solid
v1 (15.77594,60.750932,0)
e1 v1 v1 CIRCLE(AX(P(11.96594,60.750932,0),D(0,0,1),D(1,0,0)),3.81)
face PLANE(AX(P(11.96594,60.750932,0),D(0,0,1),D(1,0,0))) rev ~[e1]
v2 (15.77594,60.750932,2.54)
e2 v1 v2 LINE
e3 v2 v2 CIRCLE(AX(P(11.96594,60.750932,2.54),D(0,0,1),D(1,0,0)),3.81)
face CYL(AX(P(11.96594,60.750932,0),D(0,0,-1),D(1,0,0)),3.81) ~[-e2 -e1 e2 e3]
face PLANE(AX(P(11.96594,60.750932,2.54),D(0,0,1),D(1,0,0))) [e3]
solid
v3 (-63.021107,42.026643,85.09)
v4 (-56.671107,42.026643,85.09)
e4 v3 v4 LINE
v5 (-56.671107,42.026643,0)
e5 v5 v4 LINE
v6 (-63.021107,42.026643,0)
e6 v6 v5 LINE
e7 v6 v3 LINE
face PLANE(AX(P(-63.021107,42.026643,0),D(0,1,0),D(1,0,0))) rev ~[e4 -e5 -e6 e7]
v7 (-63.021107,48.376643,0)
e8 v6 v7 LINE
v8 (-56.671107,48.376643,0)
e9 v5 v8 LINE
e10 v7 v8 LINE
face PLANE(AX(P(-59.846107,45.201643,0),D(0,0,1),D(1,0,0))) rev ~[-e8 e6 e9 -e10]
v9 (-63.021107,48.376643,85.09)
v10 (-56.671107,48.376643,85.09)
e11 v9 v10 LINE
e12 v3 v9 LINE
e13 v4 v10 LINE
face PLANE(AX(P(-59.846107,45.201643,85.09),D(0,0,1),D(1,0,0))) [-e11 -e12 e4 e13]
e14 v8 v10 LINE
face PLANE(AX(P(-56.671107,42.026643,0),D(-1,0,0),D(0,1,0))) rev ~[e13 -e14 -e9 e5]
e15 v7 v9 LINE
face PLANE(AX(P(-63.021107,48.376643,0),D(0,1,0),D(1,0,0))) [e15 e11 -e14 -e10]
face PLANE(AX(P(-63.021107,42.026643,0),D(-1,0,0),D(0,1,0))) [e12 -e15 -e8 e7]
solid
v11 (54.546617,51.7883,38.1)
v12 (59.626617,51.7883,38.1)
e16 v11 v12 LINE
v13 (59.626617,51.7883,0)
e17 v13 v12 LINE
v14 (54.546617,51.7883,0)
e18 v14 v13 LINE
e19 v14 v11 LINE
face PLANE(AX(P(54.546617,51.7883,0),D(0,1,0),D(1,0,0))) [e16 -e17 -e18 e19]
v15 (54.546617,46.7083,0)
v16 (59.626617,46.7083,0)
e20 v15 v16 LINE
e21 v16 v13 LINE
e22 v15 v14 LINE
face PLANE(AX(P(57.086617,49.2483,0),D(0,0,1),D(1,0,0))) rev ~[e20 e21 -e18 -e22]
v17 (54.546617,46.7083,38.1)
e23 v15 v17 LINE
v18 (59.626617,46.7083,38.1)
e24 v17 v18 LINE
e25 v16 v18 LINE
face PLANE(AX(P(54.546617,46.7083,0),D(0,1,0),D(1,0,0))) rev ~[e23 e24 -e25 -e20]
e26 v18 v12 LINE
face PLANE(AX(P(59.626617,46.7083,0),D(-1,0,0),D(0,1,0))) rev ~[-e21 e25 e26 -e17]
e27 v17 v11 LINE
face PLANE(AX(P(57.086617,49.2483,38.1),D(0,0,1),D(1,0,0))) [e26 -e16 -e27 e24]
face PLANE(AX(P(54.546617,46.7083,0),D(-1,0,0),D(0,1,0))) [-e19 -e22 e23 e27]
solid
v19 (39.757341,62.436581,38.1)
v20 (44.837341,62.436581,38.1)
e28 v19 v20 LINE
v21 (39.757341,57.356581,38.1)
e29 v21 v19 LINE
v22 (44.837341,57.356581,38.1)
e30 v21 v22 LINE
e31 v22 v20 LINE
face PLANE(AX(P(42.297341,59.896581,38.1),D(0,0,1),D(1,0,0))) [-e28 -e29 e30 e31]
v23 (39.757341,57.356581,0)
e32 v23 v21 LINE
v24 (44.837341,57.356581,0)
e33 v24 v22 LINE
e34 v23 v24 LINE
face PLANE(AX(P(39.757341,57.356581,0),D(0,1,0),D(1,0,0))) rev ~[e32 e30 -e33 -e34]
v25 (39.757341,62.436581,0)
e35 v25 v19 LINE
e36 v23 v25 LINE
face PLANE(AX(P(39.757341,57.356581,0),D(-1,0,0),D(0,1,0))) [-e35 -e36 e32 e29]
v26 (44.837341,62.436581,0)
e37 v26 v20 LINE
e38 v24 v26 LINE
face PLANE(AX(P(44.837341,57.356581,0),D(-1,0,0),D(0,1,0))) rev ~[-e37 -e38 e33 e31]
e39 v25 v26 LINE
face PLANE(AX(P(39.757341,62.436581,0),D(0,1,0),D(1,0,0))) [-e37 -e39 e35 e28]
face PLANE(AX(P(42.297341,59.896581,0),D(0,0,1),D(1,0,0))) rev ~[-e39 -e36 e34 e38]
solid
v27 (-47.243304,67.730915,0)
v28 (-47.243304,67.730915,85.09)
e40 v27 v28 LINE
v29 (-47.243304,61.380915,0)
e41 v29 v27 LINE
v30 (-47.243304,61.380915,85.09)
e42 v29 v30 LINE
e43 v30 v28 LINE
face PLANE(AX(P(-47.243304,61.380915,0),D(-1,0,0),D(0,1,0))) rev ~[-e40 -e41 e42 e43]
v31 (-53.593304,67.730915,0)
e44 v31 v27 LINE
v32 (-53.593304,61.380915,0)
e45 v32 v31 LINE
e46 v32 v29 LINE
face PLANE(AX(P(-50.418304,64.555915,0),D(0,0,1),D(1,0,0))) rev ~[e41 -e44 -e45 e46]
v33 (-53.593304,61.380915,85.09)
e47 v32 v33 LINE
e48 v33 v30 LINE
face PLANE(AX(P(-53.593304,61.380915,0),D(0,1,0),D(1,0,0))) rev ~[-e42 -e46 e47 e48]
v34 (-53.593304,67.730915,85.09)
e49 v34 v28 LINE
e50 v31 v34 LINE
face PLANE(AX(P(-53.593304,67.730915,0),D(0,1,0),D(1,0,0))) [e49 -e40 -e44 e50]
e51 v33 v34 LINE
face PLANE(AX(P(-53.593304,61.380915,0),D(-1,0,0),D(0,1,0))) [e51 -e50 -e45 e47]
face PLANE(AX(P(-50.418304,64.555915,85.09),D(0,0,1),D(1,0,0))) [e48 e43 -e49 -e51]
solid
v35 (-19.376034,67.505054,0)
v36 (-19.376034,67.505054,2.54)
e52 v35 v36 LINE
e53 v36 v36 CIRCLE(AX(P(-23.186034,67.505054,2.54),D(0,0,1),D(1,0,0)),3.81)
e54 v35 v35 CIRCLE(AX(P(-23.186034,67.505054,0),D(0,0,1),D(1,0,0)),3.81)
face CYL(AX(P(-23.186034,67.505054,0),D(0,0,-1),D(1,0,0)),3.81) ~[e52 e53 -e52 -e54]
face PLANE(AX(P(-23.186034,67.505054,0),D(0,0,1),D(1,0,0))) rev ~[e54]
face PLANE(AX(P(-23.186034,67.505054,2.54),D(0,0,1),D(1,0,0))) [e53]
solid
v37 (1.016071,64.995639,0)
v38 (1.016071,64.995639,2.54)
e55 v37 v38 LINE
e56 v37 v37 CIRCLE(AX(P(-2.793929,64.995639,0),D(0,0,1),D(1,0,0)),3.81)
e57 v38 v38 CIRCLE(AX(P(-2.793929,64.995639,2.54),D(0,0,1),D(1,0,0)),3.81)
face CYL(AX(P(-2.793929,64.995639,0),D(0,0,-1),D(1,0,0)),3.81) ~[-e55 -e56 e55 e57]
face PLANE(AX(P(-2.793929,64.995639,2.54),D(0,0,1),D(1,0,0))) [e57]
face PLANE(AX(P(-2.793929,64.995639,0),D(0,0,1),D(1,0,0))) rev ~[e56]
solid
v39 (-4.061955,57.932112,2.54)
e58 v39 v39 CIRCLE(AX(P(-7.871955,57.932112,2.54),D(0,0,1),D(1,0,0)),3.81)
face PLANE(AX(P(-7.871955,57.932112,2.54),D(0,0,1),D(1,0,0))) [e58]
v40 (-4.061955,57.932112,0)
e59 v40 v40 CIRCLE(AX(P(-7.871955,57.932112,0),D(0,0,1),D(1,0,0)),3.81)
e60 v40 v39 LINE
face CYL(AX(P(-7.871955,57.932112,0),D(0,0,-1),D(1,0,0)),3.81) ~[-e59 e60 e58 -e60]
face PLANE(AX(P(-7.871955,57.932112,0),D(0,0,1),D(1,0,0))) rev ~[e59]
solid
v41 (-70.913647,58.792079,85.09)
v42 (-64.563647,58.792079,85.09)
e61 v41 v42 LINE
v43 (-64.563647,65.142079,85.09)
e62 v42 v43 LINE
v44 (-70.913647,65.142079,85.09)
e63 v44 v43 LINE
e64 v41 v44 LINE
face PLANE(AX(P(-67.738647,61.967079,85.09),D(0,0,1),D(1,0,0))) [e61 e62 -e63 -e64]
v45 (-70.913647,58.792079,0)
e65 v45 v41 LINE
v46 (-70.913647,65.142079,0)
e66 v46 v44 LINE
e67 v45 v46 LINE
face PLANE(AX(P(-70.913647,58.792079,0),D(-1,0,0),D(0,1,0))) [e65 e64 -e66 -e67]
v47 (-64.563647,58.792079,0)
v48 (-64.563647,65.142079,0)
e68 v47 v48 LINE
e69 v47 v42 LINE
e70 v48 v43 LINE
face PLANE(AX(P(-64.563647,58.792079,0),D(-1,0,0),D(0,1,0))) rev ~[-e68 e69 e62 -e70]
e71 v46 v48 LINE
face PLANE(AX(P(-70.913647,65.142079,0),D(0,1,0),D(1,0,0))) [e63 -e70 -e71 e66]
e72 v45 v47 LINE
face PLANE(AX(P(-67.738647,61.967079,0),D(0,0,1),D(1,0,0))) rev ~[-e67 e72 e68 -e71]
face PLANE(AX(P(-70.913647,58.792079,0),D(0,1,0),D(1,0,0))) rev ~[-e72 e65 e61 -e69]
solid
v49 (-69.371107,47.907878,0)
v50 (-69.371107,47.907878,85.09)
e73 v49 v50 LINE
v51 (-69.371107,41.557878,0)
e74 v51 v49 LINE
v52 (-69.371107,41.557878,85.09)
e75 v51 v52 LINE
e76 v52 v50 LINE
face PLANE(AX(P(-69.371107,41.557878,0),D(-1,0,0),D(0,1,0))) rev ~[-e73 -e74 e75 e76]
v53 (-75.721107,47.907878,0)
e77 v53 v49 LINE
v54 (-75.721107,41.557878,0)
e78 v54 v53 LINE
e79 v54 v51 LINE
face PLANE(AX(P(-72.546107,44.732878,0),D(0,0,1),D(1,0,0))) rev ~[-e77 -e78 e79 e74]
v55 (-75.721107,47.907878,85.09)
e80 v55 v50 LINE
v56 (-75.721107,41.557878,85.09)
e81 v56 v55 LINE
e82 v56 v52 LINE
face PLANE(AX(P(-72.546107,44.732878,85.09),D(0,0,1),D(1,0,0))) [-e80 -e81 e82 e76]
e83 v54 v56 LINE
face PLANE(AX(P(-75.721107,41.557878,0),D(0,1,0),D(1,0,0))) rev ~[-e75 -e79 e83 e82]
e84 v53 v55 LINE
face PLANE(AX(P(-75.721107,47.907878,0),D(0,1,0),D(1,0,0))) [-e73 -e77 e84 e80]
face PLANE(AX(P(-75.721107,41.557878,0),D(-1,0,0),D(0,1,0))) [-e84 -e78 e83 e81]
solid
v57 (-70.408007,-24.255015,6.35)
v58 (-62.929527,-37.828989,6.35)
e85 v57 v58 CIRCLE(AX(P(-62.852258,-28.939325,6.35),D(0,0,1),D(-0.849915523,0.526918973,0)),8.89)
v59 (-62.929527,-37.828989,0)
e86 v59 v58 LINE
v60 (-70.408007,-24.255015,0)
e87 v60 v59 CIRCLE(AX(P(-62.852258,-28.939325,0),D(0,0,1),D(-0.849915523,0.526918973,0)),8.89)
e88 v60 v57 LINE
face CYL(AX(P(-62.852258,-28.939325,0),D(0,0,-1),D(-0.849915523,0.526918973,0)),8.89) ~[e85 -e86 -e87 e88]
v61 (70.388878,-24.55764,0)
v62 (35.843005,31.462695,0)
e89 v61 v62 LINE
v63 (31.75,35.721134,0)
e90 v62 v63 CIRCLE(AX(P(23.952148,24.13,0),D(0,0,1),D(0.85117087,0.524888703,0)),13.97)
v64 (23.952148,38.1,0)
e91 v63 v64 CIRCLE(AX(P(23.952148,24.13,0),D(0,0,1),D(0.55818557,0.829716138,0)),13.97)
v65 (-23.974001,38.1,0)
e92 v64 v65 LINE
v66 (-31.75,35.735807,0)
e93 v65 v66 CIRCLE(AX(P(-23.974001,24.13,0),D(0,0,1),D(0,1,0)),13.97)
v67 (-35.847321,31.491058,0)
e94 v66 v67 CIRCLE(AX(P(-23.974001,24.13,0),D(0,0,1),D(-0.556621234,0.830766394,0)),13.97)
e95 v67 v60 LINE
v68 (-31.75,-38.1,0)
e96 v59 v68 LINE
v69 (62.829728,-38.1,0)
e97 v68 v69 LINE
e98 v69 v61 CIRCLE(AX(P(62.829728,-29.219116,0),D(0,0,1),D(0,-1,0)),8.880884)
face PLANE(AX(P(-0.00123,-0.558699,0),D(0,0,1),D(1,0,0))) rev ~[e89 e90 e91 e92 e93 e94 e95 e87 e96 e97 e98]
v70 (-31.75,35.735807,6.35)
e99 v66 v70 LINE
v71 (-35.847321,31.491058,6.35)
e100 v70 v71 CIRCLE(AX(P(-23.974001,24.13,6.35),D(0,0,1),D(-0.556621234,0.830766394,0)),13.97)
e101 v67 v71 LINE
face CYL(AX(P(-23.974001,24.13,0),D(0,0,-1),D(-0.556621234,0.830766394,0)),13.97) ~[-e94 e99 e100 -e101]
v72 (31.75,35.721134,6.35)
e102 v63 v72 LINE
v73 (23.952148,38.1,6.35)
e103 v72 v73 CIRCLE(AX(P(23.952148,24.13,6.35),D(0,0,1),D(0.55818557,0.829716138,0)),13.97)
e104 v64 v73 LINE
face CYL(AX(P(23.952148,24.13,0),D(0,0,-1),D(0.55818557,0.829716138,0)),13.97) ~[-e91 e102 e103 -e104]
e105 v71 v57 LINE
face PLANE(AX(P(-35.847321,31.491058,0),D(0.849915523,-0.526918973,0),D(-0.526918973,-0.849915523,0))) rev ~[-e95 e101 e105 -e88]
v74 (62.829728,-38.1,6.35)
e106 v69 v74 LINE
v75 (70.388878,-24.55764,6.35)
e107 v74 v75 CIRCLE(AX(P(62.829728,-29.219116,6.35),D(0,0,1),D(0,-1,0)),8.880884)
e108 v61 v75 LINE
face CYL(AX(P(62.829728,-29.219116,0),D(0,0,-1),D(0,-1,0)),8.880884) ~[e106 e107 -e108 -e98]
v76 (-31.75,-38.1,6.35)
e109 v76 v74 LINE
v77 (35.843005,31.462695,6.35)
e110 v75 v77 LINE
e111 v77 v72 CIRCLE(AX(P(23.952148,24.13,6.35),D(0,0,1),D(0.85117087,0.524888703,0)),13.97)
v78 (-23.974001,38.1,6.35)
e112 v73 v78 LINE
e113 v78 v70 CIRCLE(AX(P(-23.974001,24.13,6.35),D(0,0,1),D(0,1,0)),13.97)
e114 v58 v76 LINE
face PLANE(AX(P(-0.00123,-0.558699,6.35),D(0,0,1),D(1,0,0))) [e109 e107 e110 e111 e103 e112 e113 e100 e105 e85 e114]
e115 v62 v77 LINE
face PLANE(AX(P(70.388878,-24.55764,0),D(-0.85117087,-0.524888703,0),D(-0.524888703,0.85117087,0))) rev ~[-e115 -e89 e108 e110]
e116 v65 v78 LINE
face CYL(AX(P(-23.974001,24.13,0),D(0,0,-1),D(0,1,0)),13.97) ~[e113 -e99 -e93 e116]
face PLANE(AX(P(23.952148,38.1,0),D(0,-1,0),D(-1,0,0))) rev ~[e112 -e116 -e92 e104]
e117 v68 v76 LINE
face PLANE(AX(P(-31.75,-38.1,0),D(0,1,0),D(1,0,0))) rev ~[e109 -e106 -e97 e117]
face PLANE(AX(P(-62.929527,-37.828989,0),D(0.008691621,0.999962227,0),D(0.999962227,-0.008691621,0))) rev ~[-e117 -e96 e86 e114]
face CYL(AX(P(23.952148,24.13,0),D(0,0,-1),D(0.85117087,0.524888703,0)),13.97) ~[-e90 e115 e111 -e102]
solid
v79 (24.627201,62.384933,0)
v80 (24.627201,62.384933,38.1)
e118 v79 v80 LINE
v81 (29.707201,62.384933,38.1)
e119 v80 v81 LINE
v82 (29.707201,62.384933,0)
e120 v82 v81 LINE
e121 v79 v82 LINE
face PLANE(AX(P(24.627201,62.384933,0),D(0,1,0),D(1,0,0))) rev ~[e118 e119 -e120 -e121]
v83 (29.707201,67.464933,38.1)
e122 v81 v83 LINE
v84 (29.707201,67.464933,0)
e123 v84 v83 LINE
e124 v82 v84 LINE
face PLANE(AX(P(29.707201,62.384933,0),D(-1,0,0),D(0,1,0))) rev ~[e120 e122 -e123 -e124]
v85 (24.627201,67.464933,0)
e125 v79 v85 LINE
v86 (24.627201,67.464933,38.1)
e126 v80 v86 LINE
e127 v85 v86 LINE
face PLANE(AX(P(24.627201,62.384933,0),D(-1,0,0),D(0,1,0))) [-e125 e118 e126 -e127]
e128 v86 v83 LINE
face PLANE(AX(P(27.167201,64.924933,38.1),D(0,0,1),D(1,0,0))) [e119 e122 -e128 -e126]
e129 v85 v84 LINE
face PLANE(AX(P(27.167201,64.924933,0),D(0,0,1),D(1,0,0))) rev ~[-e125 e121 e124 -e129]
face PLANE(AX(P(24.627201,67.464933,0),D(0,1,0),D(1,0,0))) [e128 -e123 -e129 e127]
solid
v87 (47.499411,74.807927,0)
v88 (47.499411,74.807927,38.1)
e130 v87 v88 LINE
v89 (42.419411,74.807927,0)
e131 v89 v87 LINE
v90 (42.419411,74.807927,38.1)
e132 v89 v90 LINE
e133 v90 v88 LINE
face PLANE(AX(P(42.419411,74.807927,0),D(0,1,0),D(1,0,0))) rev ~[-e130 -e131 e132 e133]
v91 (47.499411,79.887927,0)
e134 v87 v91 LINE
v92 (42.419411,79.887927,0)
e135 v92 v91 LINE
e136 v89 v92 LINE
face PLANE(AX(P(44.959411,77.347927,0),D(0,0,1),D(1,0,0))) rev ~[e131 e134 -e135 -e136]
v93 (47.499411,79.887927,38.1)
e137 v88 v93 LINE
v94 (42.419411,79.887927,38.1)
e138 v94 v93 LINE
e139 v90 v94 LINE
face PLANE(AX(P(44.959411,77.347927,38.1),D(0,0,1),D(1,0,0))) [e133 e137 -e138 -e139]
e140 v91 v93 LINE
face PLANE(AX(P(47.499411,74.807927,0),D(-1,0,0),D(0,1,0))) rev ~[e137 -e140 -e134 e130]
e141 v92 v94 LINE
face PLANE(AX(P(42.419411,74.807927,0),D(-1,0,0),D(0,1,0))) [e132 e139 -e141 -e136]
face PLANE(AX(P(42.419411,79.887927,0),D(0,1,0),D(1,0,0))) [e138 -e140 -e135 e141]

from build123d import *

# Parameters (mm, degrees)
F1_DEPTH = 6.35
F2_W     = 6.35
F2_H     = 6.35
F3_DEPTH = 85.09
F4_W     = 5.08
F4_H     = 5.08
F5_DEPTH = 38.1
F6_R     = 3.81
F8_DEPTH = 2.54


# Not quite as in the source:
# - the program builds the solid bodies; features that only make, move or delete a surface that nothing else refers to are left out


with BuildPart() as f1:
    # F0 (on Top) → F1 (new body)
    with BuildSketch(Plane.XY):
        with BuildLine():
            ThreePointArc((31.75, 35.721134447), (28.0284665024, 37.492055385), (23.9521475884, 38.1))
            Line((23.9521475884, 38.1), (-23.9740013608, 38.1))
            ThreePointArc((-23.9740013608, 38.1), (-28.0377301168, 37.4958897421), (-31.75, 35.7358065279))
            Line((-31.75, 35.7358065279), (-31.75, -38.1))
            Line((-31.75, -38.1), (31.75, -38.1))
            Line((31.75, -38.1), (31.75, 35.721134447))
        make_face()
        with BuildLine():
            Line((-31.75, -38.1), (-31.75, 35.7358065279))
            ThreePointArc((-31.75, 35.7358065279), (-34.0252899215, 33.8321903852), (-35.8473212157, 31.4910580505))
            Line((-35.8473212157, 31.4910580505), (-70.4080074235, -24.2550152634))
            ThreePointArc((-70.4080074235, -24.2550152634), (-70.6387165875, -33.2292164554), (-62.9295269359, -37.8289891312))
            Line((-62.9295269359, -37.8289891312), (-31.75, -38.1))
        make_face()
        with BuildLine():
            ThreePointArc((35.8430046385, 31.4626951809), (34.0241333068, 33.8107026443), (31.75, 35.721134447))
            Line((31.75, 35.721134447), (31.75, -38.1))
            Line((31.75, -38.1), (62.8297282478, -38.1))
            ThreePointArc((62.8297282478, -38.1), (70.5843439151, -33.5476304603), (70.3888780957, -24.5576401551))
            Line((70.3888780957, -24.5576401551), (35.8430046385, 31.4626951809))
        make_face()
    extrude(amount=F1_DEPTH)


with BuildPart() as f3:
    # F2 (on Top) → F3 (new body)
    with BuildSketch(Plane.XY):
        with Locations((-67.7386466112, 61.9670785964)):
            Rectangle(F2_W, F2_H)
    extrude(amount=F3_DEPTH)


with BuildPart() as f3b:
    # F2 (on Top) → F3, piece 2 (new body)
    with BuildSketch(Plane.XY):
        with Locations((-72.5461074233, 44.7328782558)):
            Rectangle(F2_W, F2_H)
    extrude(amount=F3_DEPTH)


with BuildPart() as f3c:
    # F2 (on Top) → F3, piece 3 (new body)
    with BuildSketch(Plane.XY):
        with Locations((-50.4183040082, 64.5559153438)):
            Rectangle(F2_W, F2_H)
    extrude(amount=F3_DEPTH)


with BuildPart() as f3d:
    # F2 (on Top) → F3, piece 4 (new body)
    with BuildSketch(Plane.XY):
        with Locations((-59.8461074233, 45.20164271)):
            Rectangle(F2_W, F2_H)
    extrude(amount=F3_DEPTH)


with BuildPart() as f5:
    # F4 (on Top) → F5 (new body)
    with BuildSketch(Plane.XY):
        with Locations((27.1672014992, 64.9249330163)):
            Rectangle(F4_W, F4_H)
    extrude(amount=F5_DEPTH)


with BuildPart() as f5b:
    # F4 (on Top) → F5, piece 2 (new body)
    with BuildSketch(Plane.XY):
        with Locations((44.959411025, 77.3479267955)):
            Rectangle(F4_W, F4_H)
    extrude(amount=F5_DEPTH)


with BuildPart() as f5c:
    # F4 (on Top) → F5, piece 3 (new body)
    with BuildSketch(Plane.XY):
        with Locations((42.2973409295, 59.8965808749)):
            Rectangle(F4_W, F4_H)
    extrude(amount=F5_DEPTH)


with BuildPart() as f5d:
    # F4 (on Top) → F5, piece 4 (new body)
    with BuildSketch(Plane.XY):
        with Locations((57.0866167545, 49.2483004928)):
            Rectangle(F4_W, F4_H)
    extrude(amount=F5_DEPTH)


with BuildPart() as f8:
    # F6 (on Top) → F8 (new body)
    with BuildSketch(Plane.XY):
        with Locations((-2.7939286083, 64.9956390262)):
            Circle(F6_R)
    extrude(amount=F8_DEPTH)


with BuildPart() as f8b:
    # F6 (on Top) → F8, piece 2 (new body)
    with BuildSketch(Plane.XY):
        with Locations((11.9659397751, 60.7509315014)):
            Circle(F6_R)
    extrude(amount=F8_DEPTH)


with BuildPart() as f8c:
    # F6 (on Top) → F8, piece 3 (new body)
    with BuildSketch(Plane.XY):
        with Locations((-7.8719547018, 57.932112366)):
            Circle(F6_R)
    extrude(amount=F8_DEPTH)


with BuildPart() as f8d:
    # F6 (on Top) → F8, piece 4 (new body)
    with BuildSketch(Plane.XY):
        with Locations((-23.1860335916, 67.5050541759)):
            Circle(F6_R)
    extrude(amount=F8_DEPTH)


solid = Compound([f1.part, f3.part, f3b.part, f3c.part, f3d.part, f5.part, f5b.part, f5c.part, f5d.part, f8.part, f8b.part, f8c.part, f8d.part])
